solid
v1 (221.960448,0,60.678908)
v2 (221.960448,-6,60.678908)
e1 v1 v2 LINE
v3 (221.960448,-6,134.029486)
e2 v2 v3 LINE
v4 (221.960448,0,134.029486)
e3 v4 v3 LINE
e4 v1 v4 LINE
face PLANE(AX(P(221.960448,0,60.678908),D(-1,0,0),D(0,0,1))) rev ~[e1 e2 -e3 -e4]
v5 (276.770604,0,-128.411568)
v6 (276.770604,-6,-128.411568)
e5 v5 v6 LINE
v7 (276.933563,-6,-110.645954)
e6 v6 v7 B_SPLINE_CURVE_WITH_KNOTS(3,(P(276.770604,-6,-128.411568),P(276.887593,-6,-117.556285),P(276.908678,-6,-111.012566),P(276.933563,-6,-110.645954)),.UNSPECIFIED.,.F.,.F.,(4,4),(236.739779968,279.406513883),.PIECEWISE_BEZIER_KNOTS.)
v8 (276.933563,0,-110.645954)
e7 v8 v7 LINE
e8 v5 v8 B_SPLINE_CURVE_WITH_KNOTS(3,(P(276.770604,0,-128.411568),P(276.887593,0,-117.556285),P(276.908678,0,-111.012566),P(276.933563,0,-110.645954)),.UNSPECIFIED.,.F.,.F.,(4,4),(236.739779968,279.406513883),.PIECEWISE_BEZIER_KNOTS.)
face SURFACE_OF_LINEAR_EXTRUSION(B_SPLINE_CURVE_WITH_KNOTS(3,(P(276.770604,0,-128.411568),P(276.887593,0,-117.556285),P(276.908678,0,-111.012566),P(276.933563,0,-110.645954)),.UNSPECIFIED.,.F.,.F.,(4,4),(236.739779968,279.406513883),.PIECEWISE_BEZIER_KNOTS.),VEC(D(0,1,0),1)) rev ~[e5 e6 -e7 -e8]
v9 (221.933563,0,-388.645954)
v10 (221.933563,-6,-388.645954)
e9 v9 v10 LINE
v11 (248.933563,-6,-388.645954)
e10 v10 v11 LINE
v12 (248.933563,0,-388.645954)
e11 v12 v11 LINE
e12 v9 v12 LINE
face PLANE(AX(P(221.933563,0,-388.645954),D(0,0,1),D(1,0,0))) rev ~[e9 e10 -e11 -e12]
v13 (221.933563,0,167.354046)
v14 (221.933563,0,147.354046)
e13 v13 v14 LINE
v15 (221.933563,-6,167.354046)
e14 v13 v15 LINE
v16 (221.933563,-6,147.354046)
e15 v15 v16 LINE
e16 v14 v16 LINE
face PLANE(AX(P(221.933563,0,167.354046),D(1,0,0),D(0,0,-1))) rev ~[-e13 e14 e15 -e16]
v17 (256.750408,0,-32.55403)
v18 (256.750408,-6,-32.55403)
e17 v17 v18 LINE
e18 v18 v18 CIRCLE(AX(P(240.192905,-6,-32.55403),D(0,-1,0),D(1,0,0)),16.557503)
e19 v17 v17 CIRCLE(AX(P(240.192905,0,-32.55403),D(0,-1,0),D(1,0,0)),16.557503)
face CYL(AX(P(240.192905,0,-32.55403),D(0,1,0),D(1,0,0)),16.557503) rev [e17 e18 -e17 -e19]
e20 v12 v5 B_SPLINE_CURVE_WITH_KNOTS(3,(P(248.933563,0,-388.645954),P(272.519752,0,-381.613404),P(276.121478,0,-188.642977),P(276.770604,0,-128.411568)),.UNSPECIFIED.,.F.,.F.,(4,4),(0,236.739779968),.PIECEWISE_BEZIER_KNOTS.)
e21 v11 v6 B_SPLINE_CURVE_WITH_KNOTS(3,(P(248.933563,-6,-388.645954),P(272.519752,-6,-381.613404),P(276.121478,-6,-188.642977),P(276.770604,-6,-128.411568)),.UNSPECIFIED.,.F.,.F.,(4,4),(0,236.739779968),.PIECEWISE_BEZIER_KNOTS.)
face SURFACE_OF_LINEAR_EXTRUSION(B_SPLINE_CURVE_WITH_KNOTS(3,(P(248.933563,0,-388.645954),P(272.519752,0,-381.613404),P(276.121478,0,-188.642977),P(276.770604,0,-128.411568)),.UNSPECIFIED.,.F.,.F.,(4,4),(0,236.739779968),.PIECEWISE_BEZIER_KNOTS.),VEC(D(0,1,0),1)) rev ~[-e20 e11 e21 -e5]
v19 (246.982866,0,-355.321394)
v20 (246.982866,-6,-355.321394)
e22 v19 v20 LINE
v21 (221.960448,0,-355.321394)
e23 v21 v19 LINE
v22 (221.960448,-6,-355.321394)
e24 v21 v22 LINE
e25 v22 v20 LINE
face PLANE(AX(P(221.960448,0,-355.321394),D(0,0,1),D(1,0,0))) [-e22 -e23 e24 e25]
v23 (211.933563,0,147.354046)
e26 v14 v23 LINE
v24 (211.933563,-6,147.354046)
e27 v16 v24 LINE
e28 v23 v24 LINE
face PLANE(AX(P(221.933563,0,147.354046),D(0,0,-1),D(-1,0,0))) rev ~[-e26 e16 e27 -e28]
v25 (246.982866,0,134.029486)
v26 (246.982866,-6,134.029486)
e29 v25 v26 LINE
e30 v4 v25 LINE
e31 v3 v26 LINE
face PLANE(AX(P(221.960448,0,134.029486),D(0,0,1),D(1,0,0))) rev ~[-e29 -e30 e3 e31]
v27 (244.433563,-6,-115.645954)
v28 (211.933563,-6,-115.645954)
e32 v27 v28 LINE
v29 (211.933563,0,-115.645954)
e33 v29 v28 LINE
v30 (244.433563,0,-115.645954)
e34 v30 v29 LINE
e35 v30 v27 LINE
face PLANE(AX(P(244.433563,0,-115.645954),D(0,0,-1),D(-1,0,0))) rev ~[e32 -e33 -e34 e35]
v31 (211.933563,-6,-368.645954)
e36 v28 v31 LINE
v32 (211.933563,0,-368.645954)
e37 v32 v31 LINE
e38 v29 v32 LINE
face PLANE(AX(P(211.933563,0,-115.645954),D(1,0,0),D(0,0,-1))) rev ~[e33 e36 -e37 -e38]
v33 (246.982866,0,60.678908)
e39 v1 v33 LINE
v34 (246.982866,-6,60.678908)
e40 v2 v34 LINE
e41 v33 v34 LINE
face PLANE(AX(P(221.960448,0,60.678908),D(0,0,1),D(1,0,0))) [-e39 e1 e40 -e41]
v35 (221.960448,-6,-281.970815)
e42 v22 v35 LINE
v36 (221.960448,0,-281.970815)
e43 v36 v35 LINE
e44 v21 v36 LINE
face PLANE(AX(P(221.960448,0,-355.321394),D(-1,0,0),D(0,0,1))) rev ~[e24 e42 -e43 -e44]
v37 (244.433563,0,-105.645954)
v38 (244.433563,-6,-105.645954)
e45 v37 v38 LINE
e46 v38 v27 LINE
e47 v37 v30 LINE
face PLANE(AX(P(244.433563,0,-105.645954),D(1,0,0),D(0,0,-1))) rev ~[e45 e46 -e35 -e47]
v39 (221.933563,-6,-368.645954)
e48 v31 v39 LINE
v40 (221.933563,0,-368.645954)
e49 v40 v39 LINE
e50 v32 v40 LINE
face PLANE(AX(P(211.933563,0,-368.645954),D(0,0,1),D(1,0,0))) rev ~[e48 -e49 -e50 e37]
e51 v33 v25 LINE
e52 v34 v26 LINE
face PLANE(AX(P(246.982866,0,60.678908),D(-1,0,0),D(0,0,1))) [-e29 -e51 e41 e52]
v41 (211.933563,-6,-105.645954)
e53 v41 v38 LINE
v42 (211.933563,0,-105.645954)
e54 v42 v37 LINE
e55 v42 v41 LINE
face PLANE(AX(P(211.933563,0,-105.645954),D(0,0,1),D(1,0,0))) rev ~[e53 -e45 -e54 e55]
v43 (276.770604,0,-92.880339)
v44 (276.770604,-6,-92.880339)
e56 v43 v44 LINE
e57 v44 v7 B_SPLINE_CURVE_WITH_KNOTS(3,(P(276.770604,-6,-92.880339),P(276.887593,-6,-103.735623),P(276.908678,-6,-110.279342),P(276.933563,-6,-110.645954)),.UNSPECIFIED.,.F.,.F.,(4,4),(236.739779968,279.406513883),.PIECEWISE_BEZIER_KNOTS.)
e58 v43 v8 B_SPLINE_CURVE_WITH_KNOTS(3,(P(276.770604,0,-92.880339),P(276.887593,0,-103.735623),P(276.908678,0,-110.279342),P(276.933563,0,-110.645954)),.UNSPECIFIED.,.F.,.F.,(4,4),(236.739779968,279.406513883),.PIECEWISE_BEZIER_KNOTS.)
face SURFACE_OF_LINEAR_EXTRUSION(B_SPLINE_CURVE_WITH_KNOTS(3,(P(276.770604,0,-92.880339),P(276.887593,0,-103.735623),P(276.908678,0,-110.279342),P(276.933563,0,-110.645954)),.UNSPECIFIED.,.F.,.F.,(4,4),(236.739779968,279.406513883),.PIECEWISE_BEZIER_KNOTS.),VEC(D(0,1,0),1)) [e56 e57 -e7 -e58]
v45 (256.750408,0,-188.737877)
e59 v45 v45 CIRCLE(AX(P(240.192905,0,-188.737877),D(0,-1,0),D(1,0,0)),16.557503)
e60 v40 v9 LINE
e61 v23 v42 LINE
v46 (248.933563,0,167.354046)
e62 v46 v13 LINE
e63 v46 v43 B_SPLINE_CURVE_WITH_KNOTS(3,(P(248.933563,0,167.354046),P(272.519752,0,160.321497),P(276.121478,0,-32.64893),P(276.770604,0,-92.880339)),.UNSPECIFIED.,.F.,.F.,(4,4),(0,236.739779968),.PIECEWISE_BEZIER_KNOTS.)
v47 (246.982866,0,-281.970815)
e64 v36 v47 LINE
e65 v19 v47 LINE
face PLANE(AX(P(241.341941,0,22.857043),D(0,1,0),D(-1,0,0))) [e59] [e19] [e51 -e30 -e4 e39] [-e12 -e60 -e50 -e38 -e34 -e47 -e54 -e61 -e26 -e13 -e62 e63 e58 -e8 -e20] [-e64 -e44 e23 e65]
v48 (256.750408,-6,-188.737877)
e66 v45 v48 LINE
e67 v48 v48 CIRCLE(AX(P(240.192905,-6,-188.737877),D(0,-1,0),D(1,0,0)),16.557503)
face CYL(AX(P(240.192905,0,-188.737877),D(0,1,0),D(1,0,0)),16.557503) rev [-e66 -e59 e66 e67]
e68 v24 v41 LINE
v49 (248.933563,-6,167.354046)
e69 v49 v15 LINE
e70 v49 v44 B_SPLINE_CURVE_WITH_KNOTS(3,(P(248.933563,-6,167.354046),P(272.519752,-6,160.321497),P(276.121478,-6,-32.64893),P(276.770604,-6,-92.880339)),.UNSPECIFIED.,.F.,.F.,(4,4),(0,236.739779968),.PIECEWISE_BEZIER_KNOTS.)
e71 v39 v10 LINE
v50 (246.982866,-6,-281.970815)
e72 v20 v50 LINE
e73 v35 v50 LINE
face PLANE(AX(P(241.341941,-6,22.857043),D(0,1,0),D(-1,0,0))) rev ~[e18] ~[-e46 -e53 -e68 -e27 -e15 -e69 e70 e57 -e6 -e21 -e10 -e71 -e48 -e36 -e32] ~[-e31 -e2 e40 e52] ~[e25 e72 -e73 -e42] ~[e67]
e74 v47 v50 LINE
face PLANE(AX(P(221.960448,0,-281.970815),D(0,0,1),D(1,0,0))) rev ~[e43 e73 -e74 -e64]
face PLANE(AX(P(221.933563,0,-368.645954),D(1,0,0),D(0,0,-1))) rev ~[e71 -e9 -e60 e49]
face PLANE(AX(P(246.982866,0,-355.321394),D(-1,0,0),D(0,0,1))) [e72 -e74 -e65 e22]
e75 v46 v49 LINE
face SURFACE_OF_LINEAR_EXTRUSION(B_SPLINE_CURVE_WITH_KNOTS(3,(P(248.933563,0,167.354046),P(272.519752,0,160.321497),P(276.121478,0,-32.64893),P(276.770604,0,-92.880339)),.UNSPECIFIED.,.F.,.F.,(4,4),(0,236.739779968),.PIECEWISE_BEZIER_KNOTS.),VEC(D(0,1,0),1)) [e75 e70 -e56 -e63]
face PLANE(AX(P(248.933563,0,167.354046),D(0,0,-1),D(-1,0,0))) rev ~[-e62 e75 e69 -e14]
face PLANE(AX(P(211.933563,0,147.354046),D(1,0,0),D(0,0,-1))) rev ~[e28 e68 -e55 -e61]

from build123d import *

# Parameters (mm, degrees)
F0_R     = 16.5575031532
F0_W     = 25.0224173069
F0_H     = 73.3505785465
F1_DEPTH = 6


# Not quite as in the source:
# - a feature names something its author has since deleted; it is built from what else it names


with BuildPart() as f1:
    # F0 (on Front) → F1 (new body)
    with BuildSketch(Plane.XZ):
        with BuildLine():
            add(Edge.make_bspline(
                [(248.9335625079, 167.3540463153), (272.5197521804, 160.3214966928), (276.1214780845, -32.6489303119), (276.7706038072, -92.8803390196)],
                knots=[0, 0, 0, 0, 236.7397799676, 236.7397799676, 236.7397799676, 236.7397799676], degree=3))
            Line((248.9335625079, 167.3540463153), (221.9335625079, 167.3540463153))
            Line((221.9335625079, 167.3540463153), (221.9335625079, 147.3540463153))
            Line((221.9335625079, 147.3540463153), (211.9335625079, 147.3540463153))
            Line((211.9335625079, 147.3540463153), (211.9335625079, -105.6459536847))
            Line((211.9335625079, -105.6459536847), (244.4335625079, -105.6459536847))
            Line((244.4335625079, -105.6459536847), (244.4335625079, -110.6459536847))
            Line((244.4335625079, -110.6459536847), (276.9335625079, -110.6459536847))
            add(Edge.make_bspline(
                [(276.7706038072, -92.8803390196), (276.8875933326, -103.7356227789), (276.9086779216, -110.279341705), (276.9335625079, -110.6459536847)],
                knots=[236.7397799676, 236.7397799676, 236.7397799676, 236.7397799676, 279.4065138826, 279.4065138826, 279.4065138826, 279.4065138826], degree=3))
        make_face()
        with Locations((240.1929050684, -32.5540304184)):
            Circle(F0_R, mode=Mode.SUBTRACT)
        with Locations((234.4716570738, 97.3541972034)):
            Rectangle(F0_W, F0_H, mode=Mode.SUBTRACT)
        with BuildLine():
            add(Edge.make_bspline(
                [(276.7706038072, -128.4115683497), (276.8875933326, -117.5562845905), (276.9086779216, -111.0125656644), (276.9335625079, -110.6459536847)],
                knots=[236.7397799677, 236.7397799677, 236.7397799677, 236.7397799677, 279.4065138826, 279.4065138826, 279.4065138826, 279.4065138826], degree=3))
            Line((276.9335625079, -110.6459536847), (244.4335625079, -110.6459536847))
            Line((244.4335625079, -110.6459536847), (244.4335625079, -115.6459536847))
            Line((244.4335625079, -115.6459536847), (211.9335625079, -115.6459536847))
            Line((211.9335625079, -115.6459536847), (211.9335625079, -368.6459536847))
            Line((211.9335625079, -368.6459536847), (221.9335625079, -368.6459536847))
            Line((221.9335625079, -368.6459536847), (221.9335625079, -388.6459536847))
            Line((221.9335625079, -388.6459536847), (248.9335625079, -388.6459536847))
            add(Edge.make_bspline(
                [(248.9335625079, -388.6459536847), (272.5197521804, -381.6134040622), (276.1214780845, -188.6429770574), (276.7706038072, -128.4115683497)],
                knots=[0, 0, 0, 0, 236.7397799677, 236.7397799677, 236.7397799677, 236.7397799677], degree=3))
        make_face()
        with Locations((234.4716570738, -318.6461045727)):
            Rectangle(F0_W, F0_H, mode=Mode.SUBTRACT)
        with Locations((240.1929050684, -188.737876951)):
            Circle(F0_R, mode=Mode.SUBTRACT)
    extrude(amount=F1_DEPTH)


solid = f1.part
